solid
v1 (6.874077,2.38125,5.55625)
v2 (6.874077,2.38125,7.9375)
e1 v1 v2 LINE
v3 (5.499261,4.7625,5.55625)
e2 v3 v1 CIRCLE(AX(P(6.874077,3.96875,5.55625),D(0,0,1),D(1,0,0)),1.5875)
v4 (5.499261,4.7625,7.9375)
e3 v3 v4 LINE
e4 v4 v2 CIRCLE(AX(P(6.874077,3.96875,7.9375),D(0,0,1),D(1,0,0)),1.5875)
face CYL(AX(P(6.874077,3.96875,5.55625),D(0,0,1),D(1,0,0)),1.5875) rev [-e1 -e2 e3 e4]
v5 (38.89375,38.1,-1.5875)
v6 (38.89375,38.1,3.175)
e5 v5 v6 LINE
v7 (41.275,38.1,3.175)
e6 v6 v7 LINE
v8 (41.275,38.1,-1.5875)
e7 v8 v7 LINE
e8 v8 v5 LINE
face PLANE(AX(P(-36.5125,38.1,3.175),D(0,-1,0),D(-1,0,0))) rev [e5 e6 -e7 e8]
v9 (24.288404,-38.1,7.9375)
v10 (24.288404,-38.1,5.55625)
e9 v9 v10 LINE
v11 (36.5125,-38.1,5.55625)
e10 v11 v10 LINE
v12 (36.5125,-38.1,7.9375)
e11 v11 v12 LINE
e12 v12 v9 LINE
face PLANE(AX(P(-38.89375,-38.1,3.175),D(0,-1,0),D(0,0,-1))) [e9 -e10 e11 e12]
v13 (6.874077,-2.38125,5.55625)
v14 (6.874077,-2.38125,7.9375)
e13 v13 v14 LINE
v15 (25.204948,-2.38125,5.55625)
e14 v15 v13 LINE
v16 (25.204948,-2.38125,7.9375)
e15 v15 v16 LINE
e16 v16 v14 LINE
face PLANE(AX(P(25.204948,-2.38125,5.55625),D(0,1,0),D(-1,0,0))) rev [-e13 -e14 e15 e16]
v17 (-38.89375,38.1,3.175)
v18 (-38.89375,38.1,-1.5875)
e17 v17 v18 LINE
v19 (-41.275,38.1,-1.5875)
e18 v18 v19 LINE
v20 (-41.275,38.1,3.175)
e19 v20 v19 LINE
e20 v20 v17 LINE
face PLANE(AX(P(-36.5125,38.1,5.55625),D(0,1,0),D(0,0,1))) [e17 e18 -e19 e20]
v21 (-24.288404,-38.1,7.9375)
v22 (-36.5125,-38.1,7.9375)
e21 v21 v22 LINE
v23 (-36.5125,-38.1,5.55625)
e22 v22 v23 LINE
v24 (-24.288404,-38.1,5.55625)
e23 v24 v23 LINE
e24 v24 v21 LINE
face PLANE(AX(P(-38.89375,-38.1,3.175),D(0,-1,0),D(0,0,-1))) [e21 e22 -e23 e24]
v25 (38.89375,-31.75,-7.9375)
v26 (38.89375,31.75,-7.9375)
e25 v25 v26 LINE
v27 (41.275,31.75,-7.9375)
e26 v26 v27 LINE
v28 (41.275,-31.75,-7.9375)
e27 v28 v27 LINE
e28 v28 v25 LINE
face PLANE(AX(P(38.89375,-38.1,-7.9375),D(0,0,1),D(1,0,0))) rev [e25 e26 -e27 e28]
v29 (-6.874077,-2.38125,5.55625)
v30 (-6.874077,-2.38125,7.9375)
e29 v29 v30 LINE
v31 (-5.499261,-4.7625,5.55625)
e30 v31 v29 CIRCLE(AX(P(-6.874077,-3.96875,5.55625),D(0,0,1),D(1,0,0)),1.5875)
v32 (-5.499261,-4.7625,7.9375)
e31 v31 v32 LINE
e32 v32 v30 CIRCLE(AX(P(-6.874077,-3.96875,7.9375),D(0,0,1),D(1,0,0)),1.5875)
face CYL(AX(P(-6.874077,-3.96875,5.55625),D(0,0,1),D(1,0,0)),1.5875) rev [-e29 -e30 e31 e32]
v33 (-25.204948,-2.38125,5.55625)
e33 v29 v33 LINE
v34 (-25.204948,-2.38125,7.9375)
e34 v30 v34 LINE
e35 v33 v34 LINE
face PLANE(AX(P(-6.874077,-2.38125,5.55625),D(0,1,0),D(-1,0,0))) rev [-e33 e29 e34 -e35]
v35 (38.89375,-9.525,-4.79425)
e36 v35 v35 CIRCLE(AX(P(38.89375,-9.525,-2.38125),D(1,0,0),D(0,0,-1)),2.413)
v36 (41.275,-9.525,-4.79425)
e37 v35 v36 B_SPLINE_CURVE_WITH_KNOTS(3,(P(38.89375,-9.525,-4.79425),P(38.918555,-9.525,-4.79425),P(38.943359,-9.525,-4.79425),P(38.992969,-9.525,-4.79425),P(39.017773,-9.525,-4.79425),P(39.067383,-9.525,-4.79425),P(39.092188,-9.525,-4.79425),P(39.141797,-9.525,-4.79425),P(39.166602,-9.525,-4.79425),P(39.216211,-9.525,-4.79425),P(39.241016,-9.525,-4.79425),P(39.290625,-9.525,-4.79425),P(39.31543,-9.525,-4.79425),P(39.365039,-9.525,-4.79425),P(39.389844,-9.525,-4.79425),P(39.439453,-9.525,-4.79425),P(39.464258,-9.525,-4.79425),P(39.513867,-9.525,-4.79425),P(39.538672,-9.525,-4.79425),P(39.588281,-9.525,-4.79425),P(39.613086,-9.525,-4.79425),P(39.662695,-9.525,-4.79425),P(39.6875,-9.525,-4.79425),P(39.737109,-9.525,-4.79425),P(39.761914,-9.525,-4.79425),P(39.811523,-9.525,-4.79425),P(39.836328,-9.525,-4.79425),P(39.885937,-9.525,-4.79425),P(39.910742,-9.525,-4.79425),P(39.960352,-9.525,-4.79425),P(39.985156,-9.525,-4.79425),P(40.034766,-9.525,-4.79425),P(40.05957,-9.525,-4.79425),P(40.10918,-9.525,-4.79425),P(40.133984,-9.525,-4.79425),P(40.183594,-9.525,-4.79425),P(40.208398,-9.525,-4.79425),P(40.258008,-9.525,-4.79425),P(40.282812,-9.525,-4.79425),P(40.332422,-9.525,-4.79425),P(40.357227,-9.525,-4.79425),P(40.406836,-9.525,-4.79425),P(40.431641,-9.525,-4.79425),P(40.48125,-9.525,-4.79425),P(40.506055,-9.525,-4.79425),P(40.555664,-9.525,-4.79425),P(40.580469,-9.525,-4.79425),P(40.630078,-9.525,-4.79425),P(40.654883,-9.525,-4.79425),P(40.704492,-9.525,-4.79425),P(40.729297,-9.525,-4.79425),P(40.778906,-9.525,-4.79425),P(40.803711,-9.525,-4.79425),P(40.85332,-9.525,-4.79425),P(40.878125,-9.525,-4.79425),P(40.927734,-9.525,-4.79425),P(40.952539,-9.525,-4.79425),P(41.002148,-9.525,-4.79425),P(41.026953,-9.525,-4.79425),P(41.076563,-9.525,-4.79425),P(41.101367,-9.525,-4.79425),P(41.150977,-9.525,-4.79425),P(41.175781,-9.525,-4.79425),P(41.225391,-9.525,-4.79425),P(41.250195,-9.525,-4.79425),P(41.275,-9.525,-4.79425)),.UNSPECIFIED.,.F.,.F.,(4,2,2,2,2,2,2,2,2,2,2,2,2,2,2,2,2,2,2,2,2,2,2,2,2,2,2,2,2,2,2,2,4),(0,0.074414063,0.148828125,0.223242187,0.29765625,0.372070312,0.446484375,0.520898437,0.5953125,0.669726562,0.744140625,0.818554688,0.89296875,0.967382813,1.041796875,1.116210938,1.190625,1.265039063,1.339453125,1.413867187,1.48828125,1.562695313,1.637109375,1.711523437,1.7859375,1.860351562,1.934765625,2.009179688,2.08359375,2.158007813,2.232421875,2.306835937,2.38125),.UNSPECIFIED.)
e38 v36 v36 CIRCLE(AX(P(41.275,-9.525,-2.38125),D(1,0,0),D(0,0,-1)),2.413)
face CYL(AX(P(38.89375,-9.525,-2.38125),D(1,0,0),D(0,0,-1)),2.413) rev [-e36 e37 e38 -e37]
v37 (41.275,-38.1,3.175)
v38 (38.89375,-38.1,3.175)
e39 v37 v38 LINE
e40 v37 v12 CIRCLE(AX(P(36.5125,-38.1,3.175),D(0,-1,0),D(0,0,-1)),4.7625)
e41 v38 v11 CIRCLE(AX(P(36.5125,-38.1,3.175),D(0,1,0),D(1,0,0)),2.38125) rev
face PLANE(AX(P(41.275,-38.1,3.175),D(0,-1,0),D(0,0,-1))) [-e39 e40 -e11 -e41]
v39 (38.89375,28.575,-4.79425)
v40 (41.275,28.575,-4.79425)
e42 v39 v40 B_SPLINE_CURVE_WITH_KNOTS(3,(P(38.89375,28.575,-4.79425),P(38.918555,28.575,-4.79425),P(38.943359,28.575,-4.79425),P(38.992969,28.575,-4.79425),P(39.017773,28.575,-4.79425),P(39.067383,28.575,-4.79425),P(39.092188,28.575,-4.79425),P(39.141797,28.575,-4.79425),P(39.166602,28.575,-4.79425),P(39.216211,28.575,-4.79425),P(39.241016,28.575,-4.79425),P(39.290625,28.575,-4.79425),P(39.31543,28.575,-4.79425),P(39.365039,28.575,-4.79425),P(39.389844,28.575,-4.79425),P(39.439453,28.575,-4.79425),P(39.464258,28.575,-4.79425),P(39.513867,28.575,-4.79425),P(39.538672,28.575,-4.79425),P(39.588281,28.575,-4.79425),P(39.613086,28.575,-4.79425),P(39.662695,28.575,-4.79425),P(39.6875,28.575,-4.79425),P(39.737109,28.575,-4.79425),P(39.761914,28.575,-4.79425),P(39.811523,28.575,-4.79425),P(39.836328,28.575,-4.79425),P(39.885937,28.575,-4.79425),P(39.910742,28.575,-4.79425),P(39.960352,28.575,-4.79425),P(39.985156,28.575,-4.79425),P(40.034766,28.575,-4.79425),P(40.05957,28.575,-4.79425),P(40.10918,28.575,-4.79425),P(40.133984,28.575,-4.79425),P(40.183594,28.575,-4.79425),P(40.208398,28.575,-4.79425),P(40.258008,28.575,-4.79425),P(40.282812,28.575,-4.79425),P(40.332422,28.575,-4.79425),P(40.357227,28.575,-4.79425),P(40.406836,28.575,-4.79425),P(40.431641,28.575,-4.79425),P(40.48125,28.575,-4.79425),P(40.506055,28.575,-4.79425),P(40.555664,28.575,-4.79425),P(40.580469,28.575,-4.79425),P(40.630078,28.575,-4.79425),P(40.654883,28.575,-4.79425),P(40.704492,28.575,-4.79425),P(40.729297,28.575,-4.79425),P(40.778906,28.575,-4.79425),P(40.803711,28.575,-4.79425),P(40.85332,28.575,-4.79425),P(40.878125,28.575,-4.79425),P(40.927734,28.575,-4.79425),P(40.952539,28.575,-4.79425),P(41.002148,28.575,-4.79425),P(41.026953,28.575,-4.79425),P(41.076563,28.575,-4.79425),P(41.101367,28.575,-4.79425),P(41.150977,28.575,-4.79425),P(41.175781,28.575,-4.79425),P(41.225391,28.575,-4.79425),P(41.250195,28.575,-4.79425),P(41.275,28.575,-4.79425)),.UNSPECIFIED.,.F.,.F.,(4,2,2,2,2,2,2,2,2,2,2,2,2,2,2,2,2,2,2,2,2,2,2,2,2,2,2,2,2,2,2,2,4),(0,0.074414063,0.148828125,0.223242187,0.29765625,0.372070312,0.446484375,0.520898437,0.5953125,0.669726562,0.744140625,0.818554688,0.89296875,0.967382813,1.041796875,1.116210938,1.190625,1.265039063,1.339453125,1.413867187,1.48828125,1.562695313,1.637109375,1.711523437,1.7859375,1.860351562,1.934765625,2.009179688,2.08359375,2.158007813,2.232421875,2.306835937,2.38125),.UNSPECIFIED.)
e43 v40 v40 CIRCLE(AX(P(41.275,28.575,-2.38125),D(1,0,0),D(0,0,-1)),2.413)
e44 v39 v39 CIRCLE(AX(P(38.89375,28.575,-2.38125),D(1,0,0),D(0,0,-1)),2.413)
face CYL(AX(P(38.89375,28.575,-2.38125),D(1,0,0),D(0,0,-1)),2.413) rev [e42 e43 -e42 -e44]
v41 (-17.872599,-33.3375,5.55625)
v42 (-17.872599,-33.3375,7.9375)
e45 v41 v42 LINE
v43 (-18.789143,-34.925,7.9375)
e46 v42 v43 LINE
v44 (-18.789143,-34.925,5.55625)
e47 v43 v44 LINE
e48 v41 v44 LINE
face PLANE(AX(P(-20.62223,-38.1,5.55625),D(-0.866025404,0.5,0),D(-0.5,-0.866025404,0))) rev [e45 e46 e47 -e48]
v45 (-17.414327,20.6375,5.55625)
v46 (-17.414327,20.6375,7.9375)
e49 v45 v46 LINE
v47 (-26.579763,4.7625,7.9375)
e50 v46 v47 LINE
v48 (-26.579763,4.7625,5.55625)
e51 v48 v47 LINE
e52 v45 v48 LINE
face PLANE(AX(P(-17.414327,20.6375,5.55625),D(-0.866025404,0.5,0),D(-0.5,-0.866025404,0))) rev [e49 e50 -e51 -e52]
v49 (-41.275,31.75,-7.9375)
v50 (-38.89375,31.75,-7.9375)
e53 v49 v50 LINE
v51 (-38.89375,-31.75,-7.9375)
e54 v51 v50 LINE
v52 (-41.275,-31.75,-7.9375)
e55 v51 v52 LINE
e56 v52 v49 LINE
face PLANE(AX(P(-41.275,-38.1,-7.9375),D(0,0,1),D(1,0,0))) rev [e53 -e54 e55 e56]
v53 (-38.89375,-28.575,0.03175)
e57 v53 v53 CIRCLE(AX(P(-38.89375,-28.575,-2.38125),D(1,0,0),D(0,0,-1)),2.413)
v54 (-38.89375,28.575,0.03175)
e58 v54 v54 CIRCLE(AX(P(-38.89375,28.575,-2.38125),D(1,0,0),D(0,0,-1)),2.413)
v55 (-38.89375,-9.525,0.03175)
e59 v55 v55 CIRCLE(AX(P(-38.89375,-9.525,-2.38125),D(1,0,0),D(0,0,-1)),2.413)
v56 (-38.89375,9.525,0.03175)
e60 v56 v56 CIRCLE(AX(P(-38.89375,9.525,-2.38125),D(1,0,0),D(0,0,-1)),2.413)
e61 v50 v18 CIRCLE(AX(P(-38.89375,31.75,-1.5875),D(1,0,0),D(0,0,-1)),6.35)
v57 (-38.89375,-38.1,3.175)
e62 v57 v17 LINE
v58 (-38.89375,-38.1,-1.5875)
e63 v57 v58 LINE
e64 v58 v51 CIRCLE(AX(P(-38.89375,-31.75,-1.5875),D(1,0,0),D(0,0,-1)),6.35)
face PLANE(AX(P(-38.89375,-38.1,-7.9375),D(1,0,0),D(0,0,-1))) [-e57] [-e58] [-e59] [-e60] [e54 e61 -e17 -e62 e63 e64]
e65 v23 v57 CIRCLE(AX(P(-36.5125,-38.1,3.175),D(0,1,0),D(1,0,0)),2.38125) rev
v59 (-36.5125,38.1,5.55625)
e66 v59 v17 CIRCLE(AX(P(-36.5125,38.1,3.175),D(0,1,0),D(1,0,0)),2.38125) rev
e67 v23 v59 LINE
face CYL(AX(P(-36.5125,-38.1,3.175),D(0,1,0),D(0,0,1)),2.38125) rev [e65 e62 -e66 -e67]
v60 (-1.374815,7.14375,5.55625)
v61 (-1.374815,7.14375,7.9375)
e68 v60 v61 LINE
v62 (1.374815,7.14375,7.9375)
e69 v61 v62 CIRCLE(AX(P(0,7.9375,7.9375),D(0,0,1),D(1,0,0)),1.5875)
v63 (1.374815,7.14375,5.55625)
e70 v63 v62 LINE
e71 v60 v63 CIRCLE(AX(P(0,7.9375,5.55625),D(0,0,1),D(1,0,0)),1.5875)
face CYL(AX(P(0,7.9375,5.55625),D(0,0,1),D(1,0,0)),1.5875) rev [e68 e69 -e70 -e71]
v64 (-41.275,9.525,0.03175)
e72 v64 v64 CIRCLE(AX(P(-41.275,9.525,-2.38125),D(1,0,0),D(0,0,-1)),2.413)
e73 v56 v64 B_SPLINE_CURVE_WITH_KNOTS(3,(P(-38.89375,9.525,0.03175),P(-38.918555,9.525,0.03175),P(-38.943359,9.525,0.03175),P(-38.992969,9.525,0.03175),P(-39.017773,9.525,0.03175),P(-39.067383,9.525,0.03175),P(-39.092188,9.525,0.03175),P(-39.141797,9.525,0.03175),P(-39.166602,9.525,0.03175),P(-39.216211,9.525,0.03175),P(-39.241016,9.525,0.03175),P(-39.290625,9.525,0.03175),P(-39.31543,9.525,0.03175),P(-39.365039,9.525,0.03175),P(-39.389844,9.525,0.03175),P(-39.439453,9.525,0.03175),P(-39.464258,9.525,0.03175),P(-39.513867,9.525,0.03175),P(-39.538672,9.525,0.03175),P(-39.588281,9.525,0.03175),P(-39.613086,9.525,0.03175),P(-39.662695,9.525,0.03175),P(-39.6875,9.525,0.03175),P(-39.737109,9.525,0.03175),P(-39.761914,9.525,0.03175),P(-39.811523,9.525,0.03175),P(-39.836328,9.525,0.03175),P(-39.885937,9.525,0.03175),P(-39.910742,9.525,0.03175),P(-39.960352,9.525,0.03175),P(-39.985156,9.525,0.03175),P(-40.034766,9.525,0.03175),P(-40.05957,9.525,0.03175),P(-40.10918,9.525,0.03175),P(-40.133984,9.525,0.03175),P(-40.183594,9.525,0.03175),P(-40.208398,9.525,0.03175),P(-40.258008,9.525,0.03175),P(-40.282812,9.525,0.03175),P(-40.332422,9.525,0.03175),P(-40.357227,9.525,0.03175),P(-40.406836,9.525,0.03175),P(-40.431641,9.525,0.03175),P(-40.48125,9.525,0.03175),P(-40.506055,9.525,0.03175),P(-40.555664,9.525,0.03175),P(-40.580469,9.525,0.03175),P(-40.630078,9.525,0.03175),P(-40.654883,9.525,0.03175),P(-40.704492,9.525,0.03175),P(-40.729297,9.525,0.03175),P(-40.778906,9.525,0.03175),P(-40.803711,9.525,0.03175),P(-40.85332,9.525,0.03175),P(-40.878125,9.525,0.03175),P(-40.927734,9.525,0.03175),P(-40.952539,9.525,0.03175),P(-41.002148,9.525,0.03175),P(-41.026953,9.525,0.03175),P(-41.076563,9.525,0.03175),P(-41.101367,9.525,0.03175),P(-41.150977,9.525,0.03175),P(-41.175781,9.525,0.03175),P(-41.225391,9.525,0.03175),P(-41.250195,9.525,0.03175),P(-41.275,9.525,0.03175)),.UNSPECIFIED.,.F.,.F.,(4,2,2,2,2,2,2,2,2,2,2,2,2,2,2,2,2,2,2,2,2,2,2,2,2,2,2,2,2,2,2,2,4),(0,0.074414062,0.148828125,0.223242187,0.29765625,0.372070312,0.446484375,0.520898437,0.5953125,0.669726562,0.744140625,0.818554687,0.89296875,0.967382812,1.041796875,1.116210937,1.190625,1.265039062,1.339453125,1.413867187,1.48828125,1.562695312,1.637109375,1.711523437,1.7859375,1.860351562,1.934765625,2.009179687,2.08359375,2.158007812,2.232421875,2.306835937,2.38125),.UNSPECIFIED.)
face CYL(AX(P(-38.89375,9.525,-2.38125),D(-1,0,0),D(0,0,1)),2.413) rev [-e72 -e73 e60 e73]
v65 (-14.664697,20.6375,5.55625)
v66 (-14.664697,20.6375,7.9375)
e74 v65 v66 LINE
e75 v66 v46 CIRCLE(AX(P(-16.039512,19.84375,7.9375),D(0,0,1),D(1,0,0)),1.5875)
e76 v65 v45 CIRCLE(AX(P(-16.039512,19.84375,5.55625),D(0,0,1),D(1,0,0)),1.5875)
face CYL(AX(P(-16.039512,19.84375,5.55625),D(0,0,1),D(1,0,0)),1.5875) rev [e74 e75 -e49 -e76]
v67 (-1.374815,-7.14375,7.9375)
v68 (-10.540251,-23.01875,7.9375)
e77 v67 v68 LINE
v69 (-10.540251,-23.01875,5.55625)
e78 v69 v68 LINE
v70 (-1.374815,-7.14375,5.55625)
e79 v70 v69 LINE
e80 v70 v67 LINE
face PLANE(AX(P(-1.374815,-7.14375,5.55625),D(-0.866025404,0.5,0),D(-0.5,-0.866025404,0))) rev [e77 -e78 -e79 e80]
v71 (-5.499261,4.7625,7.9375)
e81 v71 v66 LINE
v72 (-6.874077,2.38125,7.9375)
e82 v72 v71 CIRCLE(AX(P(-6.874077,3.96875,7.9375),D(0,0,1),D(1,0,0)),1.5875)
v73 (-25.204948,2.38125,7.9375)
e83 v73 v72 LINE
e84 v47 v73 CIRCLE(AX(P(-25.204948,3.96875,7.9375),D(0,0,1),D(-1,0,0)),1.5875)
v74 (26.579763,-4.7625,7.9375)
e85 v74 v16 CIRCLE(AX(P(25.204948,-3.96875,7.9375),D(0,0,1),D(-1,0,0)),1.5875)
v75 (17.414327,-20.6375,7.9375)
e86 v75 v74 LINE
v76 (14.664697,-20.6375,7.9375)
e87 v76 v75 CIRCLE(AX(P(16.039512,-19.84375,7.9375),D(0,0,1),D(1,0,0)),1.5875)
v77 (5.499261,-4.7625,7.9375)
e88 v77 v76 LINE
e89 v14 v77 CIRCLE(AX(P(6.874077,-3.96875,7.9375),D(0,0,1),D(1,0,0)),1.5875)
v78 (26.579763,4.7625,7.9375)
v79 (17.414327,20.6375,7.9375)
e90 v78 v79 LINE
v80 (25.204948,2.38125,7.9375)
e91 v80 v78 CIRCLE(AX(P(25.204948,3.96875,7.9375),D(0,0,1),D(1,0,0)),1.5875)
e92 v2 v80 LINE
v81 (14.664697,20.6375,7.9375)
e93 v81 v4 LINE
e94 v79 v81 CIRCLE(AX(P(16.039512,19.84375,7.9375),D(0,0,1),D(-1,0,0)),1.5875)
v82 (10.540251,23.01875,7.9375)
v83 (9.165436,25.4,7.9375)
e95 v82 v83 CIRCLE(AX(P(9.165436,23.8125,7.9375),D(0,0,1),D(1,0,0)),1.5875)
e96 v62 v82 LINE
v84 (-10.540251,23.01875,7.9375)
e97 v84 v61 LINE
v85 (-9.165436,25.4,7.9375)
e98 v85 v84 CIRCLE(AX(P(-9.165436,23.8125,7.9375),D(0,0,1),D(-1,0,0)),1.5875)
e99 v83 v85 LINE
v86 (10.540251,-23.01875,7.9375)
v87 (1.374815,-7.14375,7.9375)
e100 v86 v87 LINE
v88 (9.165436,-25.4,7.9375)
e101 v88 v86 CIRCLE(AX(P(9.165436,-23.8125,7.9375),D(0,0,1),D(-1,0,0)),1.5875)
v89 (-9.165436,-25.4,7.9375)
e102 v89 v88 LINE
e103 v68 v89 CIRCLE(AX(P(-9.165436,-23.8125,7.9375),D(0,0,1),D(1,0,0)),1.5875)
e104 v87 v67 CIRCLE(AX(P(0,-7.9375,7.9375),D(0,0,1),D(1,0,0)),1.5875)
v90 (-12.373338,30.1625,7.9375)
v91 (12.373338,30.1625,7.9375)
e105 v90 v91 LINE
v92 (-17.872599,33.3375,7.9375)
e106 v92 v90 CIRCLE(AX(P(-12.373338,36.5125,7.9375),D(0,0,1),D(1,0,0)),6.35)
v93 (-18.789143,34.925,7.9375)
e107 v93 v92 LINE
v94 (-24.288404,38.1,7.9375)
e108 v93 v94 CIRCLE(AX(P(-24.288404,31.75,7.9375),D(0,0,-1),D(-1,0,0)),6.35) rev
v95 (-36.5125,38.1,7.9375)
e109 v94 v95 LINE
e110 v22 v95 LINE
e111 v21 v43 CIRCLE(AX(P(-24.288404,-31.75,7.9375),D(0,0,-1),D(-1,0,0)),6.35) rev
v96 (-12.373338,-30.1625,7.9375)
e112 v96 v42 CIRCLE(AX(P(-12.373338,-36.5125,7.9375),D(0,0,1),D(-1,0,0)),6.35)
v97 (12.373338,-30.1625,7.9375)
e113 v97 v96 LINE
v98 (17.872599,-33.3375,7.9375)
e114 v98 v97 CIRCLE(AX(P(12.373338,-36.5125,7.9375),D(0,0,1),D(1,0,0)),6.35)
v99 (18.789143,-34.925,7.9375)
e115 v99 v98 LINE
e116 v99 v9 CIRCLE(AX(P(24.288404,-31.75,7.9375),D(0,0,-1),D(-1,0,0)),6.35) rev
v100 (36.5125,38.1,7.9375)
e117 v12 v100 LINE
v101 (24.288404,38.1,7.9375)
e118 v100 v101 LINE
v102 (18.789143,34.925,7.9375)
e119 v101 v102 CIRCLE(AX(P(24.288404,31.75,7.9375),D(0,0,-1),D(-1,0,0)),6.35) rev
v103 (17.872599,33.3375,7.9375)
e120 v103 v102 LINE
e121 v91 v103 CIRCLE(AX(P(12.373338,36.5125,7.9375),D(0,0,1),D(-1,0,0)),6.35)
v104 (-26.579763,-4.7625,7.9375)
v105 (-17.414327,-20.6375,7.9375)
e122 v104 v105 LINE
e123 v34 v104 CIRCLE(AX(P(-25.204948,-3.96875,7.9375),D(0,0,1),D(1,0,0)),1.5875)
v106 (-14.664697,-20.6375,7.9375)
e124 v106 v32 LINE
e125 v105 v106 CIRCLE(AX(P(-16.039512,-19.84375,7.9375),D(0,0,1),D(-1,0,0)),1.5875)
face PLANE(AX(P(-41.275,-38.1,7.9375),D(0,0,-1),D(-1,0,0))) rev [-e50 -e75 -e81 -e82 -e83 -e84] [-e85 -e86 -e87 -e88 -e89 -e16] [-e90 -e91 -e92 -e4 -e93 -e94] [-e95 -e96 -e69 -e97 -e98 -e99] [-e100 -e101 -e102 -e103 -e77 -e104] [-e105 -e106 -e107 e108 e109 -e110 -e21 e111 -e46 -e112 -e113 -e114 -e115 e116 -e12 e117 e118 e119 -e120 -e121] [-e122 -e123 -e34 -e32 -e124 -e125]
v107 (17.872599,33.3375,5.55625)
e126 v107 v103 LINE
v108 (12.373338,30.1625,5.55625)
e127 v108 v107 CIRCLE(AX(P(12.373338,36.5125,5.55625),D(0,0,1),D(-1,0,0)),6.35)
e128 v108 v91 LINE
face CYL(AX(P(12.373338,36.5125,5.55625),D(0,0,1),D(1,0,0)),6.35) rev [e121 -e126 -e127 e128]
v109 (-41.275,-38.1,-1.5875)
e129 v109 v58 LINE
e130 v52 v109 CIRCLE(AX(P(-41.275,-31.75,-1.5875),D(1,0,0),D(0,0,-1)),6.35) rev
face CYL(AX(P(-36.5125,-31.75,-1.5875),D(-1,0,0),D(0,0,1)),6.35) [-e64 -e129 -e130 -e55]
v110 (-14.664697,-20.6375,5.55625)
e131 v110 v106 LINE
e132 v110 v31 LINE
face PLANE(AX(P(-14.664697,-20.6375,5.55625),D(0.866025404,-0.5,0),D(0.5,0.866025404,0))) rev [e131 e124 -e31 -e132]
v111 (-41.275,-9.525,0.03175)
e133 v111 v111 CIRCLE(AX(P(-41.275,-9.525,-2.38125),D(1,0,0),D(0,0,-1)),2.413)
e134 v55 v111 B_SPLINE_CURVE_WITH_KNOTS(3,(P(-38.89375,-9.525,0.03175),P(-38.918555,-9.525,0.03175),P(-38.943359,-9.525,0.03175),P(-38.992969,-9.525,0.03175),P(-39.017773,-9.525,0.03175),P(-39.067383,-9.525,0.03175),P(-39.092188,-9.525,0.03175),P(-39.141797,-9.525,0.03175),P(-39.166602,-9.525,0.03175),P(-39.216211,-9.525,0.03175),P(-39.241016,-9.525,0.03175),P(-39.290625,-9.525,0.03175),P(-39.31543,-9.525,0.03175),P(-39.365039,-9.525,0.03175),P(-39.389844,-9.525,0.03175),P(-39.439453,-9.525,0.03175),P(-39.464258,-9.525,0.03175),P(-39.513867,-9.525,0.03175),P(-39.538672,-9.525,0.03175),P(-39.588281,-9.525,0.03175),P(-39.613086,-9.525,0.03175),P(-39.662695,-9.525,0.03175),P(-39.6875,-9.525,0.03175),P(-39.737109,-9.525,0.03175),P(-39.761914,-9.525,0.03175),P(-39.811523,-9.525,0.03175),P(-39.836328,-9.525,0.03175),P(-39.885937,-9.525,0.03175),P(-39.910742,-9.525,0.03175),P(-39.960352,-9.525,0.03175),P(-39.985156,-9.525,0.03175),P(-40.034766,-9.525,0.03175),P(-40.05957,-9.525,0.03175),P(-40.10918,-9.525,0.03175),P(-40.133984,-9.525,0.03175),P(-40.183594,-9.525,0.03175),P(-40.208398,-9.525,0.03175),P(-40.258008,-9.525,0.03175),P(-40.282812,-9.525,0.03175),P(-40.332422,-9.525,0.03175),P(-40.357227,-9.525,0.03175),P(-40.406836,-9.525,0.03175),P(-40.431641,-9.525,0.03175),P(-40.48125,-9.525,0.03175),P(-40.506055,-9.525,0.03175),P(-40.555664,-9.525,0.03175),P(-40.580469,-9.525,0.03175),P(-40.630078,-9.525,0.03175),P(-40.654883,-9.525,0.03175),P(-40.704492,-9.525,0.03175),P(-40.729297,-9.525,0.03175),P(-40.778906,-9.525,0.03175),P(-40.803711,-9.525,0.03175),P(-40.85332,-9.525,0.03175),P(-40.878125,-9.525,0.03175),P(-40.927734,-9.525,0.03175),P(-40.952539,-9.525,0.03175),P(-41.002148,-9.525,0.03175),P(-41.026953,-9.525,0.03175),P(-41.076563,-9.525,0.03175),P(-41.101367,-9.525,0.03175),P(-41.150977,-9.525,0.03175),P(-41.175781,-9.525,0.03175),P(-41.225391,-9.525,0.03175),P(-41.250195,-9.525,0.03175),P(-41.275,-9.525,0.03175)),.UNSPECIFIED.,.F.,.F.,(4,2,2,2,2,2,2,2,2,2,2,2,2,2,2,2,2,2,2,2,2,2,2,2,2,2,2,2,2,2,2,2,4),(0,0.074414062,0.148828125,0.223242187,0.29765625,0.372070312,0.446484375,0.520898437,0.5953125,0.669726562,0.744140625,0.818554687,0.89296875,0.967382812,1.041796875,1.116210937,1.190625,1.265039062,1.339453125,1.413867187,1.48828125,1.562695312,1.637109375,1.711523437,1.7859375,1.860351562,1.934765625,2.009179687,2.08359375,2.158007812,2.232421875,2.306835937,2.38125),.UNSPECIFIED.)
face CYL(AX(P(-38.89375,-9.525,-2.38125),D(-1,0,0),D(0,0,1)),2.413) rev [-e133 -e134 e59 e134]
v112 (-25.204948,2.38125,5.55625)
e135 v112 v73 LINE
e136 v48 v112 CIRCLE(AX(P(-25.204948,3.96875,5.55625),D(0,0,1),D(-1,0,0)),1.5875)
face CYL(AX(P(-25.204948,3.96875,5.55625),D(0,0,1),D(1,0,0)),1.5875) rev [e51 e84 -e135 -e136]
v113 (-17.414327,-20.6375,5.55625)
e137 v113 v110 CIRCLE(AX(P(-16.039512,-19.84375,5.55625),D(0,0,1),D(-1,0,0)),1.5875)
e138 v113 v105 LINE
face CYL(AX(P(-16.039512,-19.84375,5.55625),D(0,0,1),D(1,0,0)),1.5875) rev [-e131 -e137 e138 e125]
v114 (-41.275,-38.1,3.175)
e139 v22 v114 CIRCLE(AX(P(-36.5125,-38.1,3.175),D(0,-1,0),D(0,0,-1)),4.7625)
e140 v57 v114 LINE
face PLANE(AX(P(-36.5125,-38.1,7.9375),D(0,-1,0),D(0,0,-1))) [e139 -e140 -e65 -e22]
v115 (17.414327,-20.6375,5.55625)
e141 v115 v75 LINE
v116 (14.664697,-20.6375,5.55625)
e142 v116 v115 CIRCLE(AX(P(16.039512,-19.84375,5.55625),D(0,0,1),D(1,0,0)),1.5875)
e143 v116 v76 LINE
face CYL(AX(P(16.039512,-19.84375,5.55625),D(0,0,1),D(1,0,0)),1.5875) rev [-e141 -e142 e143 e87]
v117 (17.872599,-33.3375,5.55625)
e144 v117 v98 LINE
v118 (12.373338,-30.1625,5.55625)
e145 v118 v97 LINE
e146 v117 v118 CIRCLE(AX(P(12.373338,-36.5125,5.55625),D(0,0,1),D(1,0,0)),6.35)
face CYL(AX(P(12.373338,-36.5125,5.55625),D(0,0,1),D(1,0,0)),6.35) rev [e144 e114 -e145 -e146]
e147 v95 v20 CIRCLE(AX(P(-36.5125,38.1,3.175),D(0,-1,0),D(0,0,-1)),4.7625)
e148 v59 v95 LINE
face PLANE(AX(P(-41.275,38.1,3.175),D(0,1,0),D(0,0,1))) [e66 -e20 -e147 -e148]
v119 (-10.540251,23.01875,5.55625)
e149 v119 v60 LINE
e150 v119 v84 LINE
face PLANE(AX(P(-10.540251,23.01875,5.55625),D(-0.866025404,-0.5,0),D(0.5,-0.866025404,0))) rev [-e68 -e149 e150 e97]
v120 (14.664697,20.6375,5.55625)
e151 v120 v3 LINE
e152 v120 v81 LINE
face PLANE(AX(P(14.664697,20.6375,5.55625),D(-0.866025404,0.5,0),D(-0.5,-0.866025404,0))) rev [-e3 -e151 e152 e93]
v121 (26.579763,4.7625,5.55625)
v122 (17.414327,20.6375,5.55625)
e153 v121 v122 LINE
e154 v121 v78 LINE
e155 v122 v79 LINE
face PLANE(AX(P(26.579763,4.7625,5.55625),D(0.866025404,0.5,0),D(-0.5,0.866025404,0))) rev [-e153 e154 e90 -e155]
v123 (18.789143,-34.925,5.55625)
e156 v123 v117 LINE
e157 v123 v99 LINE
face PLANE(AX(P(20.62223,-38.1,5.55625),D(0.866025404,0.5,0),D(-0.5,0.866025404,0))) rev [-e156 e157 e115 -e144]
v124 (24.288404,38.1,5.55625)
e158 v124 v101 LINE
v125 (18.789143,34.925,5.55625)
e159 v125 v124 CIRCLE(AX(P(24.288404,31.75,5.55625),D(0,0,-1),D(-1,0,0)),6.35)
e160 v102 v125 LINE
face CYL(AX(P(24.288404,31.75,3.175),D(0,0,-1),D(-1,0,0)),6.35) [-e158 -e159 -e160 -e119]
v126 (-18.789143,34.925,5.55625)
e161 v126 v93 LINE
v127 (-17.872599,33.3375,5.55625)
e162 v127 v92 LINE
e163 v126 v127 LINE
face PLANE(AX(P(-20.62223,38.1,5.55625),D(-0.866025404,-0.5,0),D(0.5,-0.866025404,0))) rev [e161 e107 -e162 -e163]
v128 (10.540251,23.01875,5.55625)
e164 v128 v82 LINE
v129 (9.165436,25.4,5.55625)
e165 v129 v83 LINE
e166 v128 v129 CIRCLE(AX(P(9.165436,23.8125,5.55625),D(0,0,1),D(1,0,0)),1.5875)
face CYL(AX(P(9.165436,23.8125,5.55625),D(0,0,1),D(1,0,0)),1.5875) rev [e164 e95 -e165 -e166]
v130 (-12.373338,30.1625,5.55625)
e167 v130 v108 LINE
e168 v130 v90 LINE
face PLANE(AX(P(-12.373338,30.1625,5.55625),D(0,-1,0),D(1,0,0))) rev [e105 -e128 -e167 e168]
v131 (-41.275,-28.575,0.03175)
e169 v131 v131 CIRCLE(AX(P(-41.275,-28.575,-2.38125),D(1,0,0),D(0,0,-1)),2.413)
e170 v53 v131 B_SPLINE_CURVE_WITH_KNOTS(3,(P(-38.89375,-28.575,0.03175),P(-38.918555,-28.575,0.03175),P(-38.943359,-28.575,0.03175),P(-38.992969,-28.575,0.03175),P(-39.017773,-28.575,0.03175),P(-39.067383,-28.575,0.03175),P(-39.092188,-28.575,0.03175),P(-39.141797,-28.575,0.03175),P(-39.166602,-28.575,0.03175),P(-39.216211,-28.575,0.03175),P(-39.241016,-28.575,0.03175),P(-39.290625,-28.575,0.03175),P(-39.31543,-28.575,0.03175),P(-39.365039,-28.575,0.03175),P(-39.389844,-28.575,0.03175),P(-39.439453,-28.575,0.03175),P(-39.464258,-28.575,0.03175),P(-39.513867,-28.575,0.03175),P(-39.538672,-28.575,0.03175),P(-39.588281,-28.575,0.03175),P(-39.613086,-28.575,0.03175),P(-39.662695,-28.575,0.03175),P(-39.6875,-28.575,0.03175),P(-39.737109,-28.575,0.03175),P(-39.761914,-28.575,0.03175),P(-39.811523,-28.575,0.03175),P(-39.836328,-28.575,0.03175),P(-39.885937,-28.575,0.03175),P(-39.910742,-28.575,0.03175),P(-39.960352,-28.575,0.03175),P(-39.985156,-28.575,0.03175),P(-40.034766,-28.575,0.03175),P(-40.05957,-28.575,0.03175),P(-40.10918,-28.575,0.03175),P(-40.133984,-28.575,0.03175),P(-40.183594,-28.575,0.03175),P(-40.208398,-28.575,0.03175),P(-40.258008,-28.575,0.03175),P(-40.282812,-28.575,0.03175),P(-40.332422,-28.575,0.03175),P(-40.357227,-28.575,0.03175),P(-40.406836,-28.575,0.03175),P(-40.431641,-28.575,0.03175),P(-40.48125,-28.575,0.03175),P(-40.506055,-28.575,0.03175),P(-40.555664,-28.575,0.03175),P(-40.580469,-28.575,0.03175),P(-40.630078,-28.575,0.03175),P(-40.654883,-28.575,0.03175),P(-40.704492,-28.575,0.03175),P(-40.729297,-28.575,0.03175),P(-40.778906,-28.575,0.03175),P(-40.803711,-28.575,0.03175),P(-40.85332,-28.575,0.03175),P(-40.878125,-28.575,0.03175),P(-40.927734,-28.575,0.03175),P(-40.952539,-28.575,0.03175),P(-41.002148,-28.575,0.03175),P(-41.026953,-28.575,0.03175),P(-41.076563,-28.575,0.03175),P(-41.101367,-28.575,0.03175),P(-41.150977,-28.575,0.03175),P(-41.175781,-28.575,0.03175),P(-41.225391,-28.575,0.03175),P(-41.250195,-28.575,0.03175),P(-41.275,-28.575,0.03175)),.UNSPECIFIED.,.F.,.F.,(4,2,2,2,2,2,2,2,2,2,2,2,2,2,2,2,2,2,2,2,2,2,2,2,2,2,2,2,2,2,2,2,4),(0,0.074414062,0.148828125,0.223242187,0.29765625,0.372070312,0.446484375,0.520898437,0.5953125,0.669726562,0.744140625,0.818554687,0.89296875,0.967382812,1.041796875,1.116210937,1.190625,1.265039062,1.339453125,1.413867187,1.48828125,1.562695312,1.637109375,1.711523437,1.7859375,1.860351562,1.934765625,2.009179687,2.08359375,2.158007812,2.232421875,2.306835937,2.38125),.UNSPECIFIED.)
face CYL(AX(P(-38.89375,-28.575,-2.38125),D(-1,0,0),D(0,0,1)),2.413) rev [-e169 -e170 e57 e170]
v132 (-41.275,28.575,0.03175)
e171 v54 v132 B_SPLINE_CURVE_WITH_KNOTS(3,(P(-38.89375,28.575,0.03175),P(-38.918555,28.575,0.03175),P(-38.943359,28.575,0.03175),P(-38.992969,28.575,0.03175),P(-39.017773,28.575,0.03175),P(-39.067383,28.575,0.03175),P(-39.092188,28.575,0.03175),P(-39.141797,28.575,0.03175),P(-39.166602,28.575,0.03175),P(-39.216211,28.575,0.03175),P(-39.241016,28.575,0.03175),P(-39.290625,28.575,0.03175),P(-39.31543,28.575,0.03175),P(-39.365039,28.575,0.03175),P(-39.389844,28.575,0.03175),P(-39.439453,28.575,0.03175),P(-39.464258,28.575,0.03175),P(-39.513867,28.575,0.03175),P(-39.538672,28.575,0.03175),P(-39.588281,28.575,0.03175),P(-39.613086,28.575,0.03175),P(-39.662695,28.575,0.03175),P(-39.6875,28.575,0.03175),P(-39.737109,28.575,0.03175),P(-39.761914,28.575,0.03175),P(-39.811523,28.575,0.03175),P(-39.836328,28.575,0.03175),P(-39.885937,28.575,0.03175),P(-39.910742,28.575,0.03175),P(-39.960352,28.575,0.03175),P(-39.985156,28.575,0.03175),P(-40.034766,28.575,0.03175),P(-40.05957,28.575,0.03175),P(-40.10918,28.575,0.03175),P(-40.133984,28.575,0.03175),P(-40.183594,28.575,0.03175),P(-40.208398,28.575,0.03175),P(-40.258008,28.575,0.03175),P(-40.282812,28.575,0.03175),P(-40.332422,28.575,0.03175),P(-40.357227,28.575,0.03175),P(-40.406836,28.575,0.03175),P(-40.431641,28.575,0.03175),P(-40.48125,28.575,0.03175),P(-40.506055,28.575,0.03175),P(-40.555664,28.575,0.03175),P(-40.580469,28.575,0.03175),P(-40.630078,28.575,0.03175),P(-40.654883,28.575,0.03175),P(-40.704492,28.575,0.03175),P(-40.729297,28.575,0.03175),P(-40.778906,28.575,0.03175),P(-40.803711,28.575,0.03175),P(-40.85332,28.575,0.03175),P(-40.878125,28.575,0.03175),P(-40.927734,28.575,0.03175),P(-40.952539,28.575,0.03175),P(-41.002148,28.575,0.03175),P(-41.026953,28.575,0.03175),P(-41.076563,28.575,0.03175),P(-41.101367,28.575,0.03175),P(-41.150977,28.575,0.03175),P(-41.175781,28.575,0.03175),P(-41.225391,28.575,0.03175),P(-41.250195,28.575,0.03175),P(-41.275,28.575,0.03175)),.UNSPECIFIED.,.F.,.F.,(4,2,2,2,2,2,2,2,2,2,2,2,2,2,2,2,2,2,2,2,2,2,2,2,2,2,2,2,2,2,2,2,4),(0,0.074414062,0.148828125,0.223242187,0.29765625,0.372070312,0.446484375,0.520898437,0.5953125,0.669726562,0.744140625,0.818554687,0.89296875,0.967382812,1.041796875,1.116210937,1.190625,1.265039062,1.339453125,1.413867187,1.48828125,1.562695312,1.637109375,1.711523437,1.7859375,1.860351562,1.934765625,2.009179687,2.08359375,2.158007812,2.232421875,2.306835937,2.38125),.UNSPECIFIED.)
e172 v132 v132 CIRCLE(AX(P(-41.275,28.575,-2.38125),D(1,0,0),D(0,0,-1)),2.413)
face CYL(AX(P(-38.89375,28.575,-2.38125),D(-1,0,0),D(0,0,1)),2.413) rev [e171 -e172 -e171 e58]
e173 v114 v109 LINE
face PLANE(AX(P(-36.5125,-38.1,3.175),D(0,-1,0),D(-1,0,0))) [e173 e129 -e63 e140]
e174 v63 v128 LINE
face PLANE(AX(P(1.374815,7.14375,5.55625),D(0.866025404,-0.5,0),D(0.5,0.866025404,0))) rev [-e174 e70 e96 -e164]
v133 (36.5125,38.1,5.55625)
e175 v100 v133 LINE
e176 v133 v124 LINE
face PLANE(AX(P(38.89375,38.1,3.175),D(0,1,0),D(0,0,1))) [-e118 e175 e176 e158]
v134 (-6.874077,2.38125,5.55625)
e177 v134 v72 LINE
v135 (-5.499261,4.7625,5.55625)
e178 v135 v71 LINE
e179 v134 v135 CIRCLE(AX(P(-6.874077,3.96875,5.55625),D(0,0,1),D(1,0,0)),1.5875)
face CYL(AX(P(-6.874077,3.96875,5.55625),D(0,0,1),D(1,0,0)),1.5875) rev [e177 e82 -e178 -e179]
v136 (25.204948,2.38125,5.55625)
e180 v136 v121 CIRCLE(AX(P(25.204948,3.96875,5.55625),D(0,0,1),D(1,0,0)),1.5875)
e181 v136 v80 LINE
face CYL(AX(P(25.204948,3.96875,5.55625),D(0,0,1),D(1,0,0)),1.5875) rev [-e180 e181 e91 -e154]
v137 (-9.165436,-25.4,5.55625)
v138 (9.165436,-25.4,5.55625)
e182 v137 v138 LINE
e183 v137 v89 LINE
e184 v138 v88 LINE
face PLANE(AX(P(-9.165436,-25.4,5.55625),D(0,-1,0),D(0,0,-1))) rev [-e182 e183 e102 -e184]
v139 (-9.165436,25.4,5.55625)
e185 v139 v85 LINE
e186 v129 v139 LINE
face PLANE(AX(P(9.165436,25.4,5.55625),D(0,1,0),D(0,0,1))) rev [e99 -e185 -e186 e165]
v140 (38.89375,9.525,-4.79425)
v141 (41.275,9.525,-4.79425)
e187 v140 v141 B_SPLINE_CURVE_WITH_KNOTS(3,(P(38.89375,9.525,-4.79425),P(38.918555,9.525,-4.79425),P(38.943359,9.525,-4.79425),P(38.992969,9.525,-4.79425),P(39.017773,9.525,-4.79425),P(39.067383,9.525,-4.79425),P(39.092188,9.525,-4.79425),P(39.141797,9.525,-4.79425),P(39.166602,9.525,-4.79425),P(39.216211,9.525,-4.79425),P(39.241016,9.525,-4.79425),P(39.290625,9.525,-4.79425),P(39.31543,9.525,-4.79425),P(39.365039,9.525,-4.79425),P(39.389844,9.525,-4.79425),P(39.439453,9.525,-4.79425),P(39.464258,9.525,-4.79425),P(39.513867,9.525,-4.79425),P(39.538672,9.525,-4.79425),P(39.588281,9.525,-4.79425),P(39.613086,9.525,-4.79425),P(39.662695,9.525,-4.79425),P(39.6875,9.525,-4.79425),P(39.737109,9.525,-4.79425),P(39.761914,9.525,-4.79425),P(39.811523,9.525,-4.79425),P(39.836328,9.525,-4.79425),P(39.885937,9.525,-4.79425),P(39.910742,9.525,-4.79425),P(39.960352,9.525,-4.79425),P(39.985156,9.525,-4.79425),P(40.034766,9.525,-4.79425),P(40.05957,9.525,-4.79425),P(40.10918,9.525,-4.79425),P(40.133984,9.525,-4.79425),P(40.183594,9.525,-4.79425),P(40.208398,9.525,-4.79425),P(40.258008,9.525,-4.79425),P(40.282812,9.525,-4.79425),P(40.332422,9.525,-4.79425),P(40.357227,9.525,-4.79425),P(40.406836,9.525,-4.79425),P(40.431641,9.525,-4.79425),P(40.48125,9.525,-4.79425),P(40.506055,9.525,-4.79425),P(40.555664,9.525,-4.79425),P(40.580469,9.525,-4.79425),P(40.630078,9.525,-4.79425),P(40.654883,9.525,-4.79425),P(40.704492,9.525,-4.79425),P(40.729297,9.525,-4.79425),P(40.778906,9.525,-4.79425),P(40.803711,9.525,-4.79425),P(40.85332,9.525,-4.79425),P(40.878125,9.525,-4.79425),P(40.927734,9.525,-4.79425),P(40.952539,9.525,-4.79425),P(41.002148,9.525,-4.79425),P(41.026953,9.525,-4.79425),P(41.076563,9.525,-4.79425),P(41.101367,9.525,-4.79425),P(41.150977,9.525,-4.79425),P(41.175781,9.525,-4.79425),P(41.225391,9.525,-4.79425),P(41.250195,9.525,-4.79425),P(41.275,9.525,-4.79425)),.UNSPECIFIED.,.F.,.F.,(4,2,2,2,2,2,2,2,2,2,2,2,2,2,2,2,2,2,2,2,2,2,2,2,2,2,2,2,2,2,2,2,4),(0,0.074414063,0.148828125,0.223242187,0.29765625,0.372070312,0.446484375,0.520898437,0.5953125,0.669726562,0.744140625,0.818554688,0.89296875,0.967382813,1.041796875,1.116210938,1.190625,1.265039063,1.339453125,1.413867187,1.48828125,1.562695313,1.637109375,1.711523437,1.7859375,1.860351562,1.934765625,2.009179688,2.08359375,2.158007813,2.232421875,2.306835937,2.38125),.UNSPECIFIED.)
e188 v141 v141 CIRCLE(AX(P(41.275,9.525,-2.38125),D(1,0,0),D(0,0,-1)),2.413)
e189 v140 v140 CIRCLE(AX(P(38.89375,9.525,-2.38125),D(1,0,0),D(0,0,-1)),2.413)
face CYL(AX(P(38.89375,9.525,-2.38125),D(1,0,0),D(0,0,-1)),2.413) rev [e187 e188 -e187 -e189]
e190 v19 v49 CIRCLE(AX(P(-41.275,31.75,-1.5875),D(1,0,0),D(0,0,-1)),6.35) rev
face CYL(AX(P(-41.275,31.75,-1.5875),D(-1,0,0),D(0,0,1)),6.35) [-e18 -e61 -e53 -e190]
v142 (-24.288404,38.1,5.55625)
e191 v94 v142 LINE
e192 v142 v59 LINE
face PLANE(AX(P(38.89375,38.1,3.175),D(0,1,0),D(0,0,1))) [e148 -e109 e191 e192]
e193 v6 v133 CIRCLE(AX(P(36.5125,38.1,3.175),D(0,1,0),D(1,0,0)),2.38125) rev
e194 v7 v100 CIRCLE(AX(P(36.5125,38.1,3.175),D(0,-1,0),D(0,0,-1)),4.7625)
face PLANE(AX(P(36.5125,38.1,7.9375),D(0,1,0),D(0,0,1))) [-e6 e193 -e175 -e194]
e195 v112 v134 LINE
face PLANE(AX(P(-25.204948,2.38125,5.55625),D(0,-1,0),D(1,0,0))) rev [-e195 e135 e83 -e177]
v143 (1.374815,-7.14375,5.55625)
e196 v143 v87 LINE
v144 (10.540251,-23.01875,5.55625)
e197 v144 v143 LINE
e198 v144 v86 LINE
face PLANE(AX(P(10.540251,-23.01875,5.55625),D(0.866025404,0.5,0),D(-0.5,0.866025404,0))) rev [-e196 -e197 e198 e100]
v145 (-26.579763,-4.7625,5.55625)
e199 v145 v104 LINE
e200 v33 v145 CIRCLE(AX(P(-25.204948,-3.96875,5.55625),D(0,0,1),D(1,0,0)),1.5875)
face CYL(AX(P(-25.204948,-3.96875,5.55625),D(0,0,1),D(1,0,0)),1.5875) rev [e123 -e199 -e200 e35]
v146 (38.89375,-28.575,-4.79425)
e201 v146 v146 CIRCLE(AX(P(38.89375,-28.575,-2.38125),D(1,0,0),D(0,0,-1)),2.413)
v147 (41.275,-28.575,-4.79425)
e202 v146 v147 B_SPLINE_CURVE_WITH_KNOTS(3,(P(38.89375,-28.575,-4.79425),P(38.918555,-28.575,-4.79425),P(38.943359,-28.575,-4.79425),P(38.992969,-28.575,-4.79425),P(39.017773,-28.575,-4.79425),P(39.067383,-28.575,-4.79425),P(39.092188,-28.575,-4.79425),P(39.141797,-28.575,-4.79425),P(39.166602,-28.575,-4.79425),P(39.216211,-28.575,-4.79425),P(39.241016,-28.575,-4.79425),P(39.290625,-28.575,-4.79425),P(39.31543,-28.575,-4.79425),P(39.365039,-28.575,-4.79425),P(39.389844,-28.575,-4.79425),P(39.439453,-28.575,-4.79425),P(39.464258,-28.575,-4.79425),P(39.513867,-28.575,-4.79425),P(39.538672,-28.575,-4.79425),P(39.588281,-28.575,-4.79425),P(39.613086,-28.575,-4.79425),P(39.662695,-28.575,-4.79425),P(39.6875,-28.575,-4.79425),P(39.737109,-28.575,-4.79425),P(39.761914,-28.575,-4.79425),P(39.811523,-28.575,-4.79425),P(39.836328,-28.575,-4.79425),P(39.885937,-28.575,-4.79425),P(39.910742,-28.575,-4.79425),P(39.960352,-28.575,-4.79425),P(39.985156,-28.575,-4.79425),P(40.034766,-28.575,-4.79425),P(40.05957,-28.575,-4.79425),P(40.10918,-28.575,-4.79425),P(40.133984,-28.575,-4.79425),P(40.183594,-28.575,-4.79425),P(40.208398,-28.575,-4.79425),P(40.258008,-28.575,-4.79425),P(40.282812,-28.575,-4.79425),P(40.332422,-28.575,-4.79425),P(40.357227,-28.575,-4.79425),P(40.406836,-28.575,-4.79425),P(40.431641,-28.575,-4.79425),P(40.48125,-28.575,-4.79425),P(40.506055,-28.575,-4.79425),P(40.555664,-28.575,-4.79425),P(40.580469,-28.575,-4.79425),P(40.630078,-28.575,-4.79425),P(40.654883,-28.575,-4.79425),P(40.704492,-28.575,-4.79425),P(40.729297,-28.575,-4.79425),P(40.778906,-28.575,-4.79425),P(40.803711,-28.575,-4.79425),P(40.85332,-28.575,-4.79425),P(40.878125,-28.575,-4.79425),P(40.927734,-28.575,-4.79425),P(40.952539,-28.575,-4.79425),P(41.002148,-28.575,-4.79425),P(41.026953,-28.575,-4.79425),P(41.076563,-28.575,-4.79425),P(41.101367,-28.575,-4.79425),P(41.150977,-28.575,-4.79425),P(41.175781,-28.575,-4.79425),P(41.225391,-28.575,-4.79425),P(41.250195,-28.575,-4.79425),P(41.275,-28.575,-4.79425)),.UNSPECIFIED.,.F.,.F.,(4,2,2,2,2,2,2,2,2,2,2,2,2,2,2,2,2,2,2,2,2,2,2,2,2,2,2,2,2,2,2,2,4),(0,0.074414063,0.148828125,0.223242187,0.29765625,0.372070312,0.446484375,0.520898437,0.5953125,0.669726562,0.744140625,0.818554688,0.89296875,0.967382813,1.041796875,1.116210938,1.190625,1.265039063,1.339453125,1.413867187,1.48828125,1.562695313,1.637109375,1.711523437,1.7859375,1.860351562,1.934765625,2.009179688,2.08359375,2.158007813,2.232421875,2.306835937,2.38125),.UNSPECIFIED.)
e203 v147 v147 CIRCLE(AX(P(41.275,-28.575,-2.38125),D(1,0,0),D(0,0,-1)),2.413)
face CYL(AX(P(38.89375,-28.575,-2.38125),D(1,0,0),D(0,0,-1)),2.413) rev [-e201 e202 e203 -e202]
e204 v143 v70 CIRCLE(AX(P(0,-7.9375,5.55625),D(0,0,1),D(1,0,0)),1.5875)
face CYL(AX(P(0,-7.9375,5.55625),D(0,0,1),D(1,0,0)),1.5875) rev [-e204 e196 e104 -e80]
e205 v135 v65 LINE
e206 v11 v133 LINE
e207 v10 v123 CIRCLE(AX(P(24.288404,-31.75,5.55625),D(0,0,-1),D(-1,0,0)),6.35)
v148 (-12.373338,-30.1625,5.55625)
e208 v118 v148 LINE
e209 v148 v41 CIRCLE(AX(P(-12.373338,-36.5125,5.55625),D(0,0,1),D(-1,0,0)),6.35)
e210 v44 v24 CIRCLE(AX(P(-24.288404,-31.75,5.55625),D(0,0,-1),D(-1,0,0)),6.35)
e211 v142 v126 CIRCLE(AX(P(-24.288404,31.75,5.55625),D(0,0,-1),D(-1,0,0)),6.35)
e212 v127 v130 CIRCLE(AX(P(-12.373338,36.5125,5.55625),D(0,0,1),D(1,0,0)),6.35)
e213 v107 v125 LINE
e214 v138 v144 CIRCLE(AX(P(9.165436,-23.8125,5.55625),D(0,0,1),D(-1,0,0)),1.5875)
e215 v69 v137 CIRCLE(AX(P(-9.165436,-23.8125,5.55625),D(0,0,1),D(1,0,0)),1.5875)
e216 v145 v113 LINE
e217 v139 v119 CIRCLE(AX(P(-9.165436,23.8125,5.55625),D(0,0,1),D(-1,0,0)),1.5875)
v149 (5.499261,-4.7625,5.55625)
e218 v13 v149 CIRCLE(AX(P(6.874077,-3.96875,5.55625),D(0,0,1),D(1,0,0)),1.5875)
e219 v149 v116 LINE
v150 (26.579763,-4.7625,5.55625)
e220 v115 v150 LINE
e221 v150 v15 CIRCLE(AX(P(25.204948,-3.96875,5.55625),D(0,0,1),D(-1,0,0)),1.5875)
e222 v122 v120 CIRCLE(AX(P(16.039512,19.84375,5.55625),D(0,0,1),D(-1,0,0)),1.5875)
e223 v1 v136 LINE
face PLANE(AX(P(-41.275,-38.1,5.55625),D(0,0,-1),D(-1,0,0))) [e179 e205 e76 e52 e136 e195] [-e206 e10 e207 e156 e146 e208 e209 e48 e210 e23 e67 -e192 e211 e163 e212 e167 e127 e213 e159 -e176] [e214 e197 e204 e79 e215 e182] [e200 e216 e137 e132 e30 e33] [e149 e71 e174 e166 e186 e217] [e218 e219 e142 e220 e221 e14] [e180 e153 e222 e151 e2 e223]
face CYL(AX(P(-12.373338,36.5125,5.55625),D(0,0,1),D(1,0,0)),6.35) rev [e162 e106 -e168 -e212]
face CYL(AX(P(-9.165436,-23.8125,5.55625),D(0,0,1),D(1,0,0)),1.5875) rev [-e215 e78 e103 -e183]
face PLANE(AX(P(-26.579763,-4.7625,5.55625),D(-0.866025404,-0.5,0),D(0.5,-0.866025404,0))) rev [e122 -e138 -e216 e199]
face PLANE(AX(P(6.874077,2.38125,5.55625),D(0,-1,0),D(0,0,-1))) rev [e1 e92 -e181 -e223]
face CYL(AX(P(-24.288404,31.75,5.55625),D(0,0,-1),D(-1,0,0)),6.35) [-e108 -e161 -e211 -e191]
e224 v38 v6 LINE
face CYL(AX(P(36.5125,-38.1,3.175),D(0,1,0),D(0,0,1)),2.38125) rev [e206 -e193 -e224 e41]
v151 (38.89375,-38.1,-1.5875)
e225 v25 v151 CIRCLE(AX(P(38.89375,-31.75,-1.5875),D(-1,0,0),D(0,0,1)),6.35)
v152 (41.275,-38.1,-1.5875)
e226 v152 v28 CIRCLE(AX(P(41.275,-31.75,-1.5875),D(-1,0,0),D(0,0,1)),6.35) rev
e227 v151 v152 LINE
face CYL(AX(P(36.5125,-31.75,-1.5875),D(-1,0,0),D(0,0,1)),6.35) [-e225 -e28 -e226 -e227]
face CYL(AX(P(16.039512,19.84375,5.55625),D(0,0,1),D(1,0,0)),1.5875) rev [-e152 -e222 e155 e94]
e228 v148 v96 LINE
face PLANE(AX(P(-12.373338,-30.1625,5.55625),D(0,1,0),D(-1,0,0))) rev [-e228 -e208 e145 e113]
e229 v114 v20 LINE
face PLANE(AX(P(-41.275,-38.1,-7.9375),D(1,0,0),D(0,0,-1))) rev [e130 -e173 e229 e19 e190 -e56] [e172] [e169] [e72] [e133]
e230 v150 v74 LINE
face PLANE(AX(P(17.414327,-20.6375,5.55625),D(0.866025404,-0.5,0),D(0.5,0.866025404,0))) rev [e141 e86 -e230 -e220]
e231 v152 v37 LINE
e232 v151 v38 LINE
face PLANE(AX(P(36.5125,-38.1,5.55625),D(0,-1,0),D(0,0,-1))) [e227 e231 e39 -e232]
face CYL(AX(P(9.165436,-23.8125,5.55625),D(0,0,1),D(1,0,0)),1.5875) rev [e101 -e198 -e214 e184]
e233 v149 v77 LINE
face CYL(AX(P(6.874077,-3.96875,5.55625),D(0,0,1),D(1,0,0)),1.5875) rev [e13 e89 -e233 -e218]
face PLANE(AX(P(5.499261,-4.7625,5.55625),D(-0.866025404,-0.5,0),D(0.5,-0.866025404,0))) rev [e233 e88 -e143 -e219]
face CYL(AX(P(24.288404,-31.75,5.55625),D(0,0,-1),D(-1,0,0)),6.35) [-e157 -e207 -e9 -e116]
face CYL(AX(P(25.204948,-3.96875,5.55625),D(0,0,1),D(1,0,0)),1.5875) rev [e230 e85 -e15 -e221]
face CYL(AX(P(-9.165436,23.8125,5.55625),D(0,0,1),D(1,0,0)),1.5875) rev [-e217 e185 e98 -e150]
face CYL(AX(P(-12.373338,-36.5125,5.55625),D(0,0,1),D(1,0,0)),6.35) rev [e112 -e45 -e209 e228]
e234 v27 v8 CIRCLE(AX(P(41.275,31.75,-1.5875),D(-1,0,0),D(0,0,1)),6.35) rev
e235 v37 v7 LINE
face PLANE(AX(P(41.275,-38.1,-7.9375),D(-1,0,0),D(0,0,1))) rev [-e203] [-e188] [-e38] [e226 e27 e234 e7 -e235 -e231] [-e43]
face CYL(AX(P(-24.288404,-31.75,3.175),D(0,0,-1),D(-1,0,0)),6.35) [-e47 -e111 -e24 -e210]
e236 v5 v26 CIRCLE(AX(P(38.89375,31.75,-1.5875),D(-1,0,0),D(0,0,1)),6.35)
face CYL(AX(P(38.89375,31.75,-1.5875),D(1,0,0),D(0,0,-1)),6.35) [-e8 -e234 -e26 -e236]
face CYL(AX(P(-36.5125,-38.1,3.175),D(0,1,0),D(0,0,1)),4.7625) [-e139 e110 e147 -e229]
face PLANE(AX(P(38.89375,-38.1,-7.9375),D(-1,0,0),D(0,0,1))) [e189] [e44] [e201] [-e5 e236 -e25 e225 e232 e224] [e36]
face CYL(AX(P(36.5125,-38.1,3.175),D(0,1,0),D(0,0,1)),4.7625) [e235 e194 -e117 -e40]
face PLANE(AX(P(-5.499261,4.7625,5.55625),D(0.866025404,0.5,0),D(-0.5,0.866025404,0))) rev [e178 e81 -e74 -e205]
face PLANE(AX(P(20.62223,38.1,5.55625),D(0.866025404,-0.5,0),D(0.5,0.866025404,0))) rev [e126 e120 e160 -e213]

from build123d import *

# Parameters (mm, degrees)
BASE_FLANGE1_DEPTH = 38.1
CUT_EXTRUDE1_DEPTH = 2.38125
FILLET1_R          = 6.35
SKETCH7_R          = 2.413
CUT_EXTRUDE2_DEPTH = 2.38125
FILLET2_R          = 6.35


# Sheet-metal steps are written as plain solids
with BuildPart() as part:
    # Sketch1 → Base-Flange1 (new, symmetric)
    with BuildSketch(Plane(origin=(0, 0, 0), x_dir=(1, 0, 0), z_dir=(0, 1, 0))):
        with BuildLine():
            Line((-41.275, 7.9375), (-41.275, -3.175))
            ThreePointArc((-41.275, -3.175), (-39.880096045, -6.542596045), (-36.5125, -7.9375))
            Line((-36.5125, -7.9375), (36.5125, -7.9375))
            ThreePointArc((36.5125, -7.9375), (39.880096045, -6.542596045), (41.275, -3.175))
            Line((41.275, -3.175), (41.275, 7.9375))
            Line((41.275, 7.9375), (38.89375, 7.9375))
            Line((38.89375, 7.9375), (38.89375, -3.175))
            ThreePointArc((38.89375, -3.175), (38.196298023, -4.858798023), (36.5125, -5.55625))
            Line((36.5125, -5.55625), (-36.5125, -5.55625))
            ThreePointArc((-36.5125, -5.55625), (-38.196298023, -4.858798023), (-38.89375, -3.175))
            Line((-38.89375, -3.175), (-38.89375, 7.9375))
            Line((-38.89375, 7.9375), (-41.275, 7.9375))
        make_face()
    extrude(amount=BASE_FLANGE1_DEPTH, both=True)

    # Sketch6 → Cut-Extrude1 (cut)
    with BuildSketch(Plane.XY.offset(7.9375)):
        with BuildLine():
            Line((-10.540250852, 23.01875), (-1.374815329, 7.14375))
            ThreePointArc((-1.374815329, 7.14375), (0, 6.35), (1.374815329, 7.14375))
            Line((1.374815329, 7.14375), (10.540250852, 23.01875))
            ThreePointArc((10.540250852, 23.01875), (10.540250852, 24.60625), (9.165435523, 25.4))
            Line((9.165435523, 25.4), (-9.165435523, 25.4))
            ThreePointArc((-9.165435523, 25.4), (-10.540250852, 24.60625), (-10.540250852, 23.01875))
        make_face()
        with BuildLine():
            Line((14.664696837, 20.6375), (5.499261314, 4.7625))
            ThreePointArc((5.499261314, 4.7625), (5.499261314, 3.175), (6.874076643, 2.38125))
            Line((6.874076643, 2.38125), (25.204947689, 2.38125))
            ThreePointArc((25.204947689, 2.38125), (26.579763018, 3.175), (26.579763018, 4.7625))
            Line((26.579763018, 4.7625), (17.414327494, 20.6375))
            ThreePointArc((17.414327494, 20.6375), (16.039512166, 21.43125), (14.664696837, 20.6375))
        make_face()
        with BuildLine():
            Line((25.204947689, -2.38125), (6.874076643, -2.38125))
            ThreePointArc((6.874076643, -2.38125), (5.499261314, -3.175), (5.499261314, -4.7625))
            Line((5.499261314, -4.7625), (14.664696837, -20.6375))
            ThreePointArc((14.664696837, -20.6375), (16.039512166, -21.43125), (17.414327494, -20.6375))
            Line((17.414327494, -20.6375), (26.579763018, -4.7625))
            ThreePointArc((26.579763018, -4.7625), (26.579763018, -3.175), (25.204947689, -2.38125))
        make_face()
        with BuildLine():
            Line((10.540250852, -23.01875), (1.374815329, -7.14375))
            ThreePointArc((1.374815329, -7.14375), (0, -6.35), (-1.374815329, -7.14375))
            Line((-1.374815329, -7.14375), (-10.540250852, -23.01875))
            ThreePointArc((-10.540250852, -23.01875), (-10.540250852, -24.60625), (-9.165435523, -25.4))
            Line((-9.165435523, -25.4), (9.165435523, -25.4))
            ThreePointArc((9.165435523, -25.4), (10.540250852, -24.60625), (10.540250852, -23.01875))
        make_face()
        with BuildLine():
            Line((-14.664696837, -20.6375), (-5.499261314, -4.7625))
            ThreePointArc((-5.499261314, -4.7625), (-5.499261314, -3.175), (-6.874076643, -2.38125))
            Line((-6.874076643, -2.38125), (-25.204947689, -2.38125))
            ThreePointArc((-25.204947689, -2.38125), (-26.579763018, -3.175), (-26.579763018, -4.7625))
            Line((-26.579763018, -4.7625), (-17.414327494, -20.6375))
            ThreePointArc((-17.414327494, -20.6375), (-16.039512166, -21.43125), (-14.664696837, -20.6375))
        make_face()
        with BuildLine():
            Line((-25.204947689, 2.38125), (-6.874076643, 2.38125))
            ThreePointArc((-6.874076643, 2.38125), (-5.499261314, 3.175), (-5.499261314, 4.7625))
            Line((-5.499261314, 4.7625), (-14.664696837, 20.6375))
            ThreePointArc((-14.664696837, 20.6375), (-16.039512166, 21.43125), (-17.414327494, 20.6375))
            Line((-17.414327494, 20.6375), (-26.579763018, 4.7625))
            ThreePointArc((-26.579763018, 4.7625), (-26.579763018, 3.175), (-25.204947689, 2.38125))
        make_face()
        with BuildLine():
            Line((-20.622229928, 38.1), (-17.872599271, 33.3375))
            ThreePointArc((-17.872599271, 33.3375), (-15.548337957, 31.013238686), (-12.373337957, 30.1625))
            Line((-12.373337957, 30.1625), (12.373337957, 30.1625))
            ThreePointArc((12.373337957, 30.1625), (15.548337957, 31.013238686), (17.872599271, 33.3375))
            Line((17.872599271, 33.3375), (20.622229928, 38.1))
            Line((20.622229928, 38.1), (-20.622229928, 38.1))
        make_face()
        with BuildLine():
            Line((-20.622229928, -38.1), (20.622229928, -38.1))
            Line((20.622229928, -38.1), (17.872599271, -33.3375))
            ThreePointArc((17.872599271, -33.3375), (15.548337957, -31.013238686), (12.373337957, -30.1625))
            Line((12.373337957, -30.1625), (-12.373337957, -30.1625))
            ThreePointArc((-12.373337957, -30.1625), (-15.548337957, -31.013238686), (-17.872599271, -33.3375))
            Line((-17.872599271, -33.3375), (-20.622229928, -38.1))
        make_face()
    extrude(amount=-CUT_EXTRUDE1_DEPTH, mode=Mode.SUBTRACT)

    # Fillet1
    fillet1_edges = [part.edges().sort_by_distance(p)[0] for p in [
        (20.622229928, -38.1, 6.746875),
        (-20.622229928, -38.1, 6.746875),
        (-20.622229928, 38.1, 6.746875),
        (20.622229928, 38.1, 6.746875),
    ]]
    fillet(fillet1_edges, radius=FILLET1_R)

    # Sketch7 → Cut-Extrude2 (cut)
    with BuildSketch(Plane(origin=(41.275, 0, 0), x_dir=(0, 0, -1), z_dir=(1, 0, 0))):
        with Locations((2.38125, 28.575)):
            Circle(SKETCH7_R)
        with Locations((2.38125, 9.525)):
            Circle(SKETCH7_R)
        with Locations((2.38125, -9.525)):
            Circle(SKETCH7_R)
        with Locations((2.38125, -28.575)):
            Circle(SKETCH7_R)
    cut_extrude2 = extrude(amount=-CUT_EXTRUDE2_DEPTH, mode=Mode.SUBTRACT)

    # Mirror1: Cut-Extrude2 across plane
    add(cut_extrude2.mirror(Plane(origin=(0, 0, 0), x_dir=(0, 0, 1), z_dir=(1, 0, 0))), mode=Mode.SUBTRACT)

    # Fillet2
    fillet2_edges = [part.edges().sort_by_distance(p)[0] for p in [
        (40.084375, 38.1, -7.9375),
        (-40.084375, 38.1, -7.9375),
        (40.084375, -38.1, -7.9375),
        (-40.084375, -38.1, -7.9375),
    ]]
    fillet(fillet2_edges, radius=FILLET2_R)


solid = part.part
